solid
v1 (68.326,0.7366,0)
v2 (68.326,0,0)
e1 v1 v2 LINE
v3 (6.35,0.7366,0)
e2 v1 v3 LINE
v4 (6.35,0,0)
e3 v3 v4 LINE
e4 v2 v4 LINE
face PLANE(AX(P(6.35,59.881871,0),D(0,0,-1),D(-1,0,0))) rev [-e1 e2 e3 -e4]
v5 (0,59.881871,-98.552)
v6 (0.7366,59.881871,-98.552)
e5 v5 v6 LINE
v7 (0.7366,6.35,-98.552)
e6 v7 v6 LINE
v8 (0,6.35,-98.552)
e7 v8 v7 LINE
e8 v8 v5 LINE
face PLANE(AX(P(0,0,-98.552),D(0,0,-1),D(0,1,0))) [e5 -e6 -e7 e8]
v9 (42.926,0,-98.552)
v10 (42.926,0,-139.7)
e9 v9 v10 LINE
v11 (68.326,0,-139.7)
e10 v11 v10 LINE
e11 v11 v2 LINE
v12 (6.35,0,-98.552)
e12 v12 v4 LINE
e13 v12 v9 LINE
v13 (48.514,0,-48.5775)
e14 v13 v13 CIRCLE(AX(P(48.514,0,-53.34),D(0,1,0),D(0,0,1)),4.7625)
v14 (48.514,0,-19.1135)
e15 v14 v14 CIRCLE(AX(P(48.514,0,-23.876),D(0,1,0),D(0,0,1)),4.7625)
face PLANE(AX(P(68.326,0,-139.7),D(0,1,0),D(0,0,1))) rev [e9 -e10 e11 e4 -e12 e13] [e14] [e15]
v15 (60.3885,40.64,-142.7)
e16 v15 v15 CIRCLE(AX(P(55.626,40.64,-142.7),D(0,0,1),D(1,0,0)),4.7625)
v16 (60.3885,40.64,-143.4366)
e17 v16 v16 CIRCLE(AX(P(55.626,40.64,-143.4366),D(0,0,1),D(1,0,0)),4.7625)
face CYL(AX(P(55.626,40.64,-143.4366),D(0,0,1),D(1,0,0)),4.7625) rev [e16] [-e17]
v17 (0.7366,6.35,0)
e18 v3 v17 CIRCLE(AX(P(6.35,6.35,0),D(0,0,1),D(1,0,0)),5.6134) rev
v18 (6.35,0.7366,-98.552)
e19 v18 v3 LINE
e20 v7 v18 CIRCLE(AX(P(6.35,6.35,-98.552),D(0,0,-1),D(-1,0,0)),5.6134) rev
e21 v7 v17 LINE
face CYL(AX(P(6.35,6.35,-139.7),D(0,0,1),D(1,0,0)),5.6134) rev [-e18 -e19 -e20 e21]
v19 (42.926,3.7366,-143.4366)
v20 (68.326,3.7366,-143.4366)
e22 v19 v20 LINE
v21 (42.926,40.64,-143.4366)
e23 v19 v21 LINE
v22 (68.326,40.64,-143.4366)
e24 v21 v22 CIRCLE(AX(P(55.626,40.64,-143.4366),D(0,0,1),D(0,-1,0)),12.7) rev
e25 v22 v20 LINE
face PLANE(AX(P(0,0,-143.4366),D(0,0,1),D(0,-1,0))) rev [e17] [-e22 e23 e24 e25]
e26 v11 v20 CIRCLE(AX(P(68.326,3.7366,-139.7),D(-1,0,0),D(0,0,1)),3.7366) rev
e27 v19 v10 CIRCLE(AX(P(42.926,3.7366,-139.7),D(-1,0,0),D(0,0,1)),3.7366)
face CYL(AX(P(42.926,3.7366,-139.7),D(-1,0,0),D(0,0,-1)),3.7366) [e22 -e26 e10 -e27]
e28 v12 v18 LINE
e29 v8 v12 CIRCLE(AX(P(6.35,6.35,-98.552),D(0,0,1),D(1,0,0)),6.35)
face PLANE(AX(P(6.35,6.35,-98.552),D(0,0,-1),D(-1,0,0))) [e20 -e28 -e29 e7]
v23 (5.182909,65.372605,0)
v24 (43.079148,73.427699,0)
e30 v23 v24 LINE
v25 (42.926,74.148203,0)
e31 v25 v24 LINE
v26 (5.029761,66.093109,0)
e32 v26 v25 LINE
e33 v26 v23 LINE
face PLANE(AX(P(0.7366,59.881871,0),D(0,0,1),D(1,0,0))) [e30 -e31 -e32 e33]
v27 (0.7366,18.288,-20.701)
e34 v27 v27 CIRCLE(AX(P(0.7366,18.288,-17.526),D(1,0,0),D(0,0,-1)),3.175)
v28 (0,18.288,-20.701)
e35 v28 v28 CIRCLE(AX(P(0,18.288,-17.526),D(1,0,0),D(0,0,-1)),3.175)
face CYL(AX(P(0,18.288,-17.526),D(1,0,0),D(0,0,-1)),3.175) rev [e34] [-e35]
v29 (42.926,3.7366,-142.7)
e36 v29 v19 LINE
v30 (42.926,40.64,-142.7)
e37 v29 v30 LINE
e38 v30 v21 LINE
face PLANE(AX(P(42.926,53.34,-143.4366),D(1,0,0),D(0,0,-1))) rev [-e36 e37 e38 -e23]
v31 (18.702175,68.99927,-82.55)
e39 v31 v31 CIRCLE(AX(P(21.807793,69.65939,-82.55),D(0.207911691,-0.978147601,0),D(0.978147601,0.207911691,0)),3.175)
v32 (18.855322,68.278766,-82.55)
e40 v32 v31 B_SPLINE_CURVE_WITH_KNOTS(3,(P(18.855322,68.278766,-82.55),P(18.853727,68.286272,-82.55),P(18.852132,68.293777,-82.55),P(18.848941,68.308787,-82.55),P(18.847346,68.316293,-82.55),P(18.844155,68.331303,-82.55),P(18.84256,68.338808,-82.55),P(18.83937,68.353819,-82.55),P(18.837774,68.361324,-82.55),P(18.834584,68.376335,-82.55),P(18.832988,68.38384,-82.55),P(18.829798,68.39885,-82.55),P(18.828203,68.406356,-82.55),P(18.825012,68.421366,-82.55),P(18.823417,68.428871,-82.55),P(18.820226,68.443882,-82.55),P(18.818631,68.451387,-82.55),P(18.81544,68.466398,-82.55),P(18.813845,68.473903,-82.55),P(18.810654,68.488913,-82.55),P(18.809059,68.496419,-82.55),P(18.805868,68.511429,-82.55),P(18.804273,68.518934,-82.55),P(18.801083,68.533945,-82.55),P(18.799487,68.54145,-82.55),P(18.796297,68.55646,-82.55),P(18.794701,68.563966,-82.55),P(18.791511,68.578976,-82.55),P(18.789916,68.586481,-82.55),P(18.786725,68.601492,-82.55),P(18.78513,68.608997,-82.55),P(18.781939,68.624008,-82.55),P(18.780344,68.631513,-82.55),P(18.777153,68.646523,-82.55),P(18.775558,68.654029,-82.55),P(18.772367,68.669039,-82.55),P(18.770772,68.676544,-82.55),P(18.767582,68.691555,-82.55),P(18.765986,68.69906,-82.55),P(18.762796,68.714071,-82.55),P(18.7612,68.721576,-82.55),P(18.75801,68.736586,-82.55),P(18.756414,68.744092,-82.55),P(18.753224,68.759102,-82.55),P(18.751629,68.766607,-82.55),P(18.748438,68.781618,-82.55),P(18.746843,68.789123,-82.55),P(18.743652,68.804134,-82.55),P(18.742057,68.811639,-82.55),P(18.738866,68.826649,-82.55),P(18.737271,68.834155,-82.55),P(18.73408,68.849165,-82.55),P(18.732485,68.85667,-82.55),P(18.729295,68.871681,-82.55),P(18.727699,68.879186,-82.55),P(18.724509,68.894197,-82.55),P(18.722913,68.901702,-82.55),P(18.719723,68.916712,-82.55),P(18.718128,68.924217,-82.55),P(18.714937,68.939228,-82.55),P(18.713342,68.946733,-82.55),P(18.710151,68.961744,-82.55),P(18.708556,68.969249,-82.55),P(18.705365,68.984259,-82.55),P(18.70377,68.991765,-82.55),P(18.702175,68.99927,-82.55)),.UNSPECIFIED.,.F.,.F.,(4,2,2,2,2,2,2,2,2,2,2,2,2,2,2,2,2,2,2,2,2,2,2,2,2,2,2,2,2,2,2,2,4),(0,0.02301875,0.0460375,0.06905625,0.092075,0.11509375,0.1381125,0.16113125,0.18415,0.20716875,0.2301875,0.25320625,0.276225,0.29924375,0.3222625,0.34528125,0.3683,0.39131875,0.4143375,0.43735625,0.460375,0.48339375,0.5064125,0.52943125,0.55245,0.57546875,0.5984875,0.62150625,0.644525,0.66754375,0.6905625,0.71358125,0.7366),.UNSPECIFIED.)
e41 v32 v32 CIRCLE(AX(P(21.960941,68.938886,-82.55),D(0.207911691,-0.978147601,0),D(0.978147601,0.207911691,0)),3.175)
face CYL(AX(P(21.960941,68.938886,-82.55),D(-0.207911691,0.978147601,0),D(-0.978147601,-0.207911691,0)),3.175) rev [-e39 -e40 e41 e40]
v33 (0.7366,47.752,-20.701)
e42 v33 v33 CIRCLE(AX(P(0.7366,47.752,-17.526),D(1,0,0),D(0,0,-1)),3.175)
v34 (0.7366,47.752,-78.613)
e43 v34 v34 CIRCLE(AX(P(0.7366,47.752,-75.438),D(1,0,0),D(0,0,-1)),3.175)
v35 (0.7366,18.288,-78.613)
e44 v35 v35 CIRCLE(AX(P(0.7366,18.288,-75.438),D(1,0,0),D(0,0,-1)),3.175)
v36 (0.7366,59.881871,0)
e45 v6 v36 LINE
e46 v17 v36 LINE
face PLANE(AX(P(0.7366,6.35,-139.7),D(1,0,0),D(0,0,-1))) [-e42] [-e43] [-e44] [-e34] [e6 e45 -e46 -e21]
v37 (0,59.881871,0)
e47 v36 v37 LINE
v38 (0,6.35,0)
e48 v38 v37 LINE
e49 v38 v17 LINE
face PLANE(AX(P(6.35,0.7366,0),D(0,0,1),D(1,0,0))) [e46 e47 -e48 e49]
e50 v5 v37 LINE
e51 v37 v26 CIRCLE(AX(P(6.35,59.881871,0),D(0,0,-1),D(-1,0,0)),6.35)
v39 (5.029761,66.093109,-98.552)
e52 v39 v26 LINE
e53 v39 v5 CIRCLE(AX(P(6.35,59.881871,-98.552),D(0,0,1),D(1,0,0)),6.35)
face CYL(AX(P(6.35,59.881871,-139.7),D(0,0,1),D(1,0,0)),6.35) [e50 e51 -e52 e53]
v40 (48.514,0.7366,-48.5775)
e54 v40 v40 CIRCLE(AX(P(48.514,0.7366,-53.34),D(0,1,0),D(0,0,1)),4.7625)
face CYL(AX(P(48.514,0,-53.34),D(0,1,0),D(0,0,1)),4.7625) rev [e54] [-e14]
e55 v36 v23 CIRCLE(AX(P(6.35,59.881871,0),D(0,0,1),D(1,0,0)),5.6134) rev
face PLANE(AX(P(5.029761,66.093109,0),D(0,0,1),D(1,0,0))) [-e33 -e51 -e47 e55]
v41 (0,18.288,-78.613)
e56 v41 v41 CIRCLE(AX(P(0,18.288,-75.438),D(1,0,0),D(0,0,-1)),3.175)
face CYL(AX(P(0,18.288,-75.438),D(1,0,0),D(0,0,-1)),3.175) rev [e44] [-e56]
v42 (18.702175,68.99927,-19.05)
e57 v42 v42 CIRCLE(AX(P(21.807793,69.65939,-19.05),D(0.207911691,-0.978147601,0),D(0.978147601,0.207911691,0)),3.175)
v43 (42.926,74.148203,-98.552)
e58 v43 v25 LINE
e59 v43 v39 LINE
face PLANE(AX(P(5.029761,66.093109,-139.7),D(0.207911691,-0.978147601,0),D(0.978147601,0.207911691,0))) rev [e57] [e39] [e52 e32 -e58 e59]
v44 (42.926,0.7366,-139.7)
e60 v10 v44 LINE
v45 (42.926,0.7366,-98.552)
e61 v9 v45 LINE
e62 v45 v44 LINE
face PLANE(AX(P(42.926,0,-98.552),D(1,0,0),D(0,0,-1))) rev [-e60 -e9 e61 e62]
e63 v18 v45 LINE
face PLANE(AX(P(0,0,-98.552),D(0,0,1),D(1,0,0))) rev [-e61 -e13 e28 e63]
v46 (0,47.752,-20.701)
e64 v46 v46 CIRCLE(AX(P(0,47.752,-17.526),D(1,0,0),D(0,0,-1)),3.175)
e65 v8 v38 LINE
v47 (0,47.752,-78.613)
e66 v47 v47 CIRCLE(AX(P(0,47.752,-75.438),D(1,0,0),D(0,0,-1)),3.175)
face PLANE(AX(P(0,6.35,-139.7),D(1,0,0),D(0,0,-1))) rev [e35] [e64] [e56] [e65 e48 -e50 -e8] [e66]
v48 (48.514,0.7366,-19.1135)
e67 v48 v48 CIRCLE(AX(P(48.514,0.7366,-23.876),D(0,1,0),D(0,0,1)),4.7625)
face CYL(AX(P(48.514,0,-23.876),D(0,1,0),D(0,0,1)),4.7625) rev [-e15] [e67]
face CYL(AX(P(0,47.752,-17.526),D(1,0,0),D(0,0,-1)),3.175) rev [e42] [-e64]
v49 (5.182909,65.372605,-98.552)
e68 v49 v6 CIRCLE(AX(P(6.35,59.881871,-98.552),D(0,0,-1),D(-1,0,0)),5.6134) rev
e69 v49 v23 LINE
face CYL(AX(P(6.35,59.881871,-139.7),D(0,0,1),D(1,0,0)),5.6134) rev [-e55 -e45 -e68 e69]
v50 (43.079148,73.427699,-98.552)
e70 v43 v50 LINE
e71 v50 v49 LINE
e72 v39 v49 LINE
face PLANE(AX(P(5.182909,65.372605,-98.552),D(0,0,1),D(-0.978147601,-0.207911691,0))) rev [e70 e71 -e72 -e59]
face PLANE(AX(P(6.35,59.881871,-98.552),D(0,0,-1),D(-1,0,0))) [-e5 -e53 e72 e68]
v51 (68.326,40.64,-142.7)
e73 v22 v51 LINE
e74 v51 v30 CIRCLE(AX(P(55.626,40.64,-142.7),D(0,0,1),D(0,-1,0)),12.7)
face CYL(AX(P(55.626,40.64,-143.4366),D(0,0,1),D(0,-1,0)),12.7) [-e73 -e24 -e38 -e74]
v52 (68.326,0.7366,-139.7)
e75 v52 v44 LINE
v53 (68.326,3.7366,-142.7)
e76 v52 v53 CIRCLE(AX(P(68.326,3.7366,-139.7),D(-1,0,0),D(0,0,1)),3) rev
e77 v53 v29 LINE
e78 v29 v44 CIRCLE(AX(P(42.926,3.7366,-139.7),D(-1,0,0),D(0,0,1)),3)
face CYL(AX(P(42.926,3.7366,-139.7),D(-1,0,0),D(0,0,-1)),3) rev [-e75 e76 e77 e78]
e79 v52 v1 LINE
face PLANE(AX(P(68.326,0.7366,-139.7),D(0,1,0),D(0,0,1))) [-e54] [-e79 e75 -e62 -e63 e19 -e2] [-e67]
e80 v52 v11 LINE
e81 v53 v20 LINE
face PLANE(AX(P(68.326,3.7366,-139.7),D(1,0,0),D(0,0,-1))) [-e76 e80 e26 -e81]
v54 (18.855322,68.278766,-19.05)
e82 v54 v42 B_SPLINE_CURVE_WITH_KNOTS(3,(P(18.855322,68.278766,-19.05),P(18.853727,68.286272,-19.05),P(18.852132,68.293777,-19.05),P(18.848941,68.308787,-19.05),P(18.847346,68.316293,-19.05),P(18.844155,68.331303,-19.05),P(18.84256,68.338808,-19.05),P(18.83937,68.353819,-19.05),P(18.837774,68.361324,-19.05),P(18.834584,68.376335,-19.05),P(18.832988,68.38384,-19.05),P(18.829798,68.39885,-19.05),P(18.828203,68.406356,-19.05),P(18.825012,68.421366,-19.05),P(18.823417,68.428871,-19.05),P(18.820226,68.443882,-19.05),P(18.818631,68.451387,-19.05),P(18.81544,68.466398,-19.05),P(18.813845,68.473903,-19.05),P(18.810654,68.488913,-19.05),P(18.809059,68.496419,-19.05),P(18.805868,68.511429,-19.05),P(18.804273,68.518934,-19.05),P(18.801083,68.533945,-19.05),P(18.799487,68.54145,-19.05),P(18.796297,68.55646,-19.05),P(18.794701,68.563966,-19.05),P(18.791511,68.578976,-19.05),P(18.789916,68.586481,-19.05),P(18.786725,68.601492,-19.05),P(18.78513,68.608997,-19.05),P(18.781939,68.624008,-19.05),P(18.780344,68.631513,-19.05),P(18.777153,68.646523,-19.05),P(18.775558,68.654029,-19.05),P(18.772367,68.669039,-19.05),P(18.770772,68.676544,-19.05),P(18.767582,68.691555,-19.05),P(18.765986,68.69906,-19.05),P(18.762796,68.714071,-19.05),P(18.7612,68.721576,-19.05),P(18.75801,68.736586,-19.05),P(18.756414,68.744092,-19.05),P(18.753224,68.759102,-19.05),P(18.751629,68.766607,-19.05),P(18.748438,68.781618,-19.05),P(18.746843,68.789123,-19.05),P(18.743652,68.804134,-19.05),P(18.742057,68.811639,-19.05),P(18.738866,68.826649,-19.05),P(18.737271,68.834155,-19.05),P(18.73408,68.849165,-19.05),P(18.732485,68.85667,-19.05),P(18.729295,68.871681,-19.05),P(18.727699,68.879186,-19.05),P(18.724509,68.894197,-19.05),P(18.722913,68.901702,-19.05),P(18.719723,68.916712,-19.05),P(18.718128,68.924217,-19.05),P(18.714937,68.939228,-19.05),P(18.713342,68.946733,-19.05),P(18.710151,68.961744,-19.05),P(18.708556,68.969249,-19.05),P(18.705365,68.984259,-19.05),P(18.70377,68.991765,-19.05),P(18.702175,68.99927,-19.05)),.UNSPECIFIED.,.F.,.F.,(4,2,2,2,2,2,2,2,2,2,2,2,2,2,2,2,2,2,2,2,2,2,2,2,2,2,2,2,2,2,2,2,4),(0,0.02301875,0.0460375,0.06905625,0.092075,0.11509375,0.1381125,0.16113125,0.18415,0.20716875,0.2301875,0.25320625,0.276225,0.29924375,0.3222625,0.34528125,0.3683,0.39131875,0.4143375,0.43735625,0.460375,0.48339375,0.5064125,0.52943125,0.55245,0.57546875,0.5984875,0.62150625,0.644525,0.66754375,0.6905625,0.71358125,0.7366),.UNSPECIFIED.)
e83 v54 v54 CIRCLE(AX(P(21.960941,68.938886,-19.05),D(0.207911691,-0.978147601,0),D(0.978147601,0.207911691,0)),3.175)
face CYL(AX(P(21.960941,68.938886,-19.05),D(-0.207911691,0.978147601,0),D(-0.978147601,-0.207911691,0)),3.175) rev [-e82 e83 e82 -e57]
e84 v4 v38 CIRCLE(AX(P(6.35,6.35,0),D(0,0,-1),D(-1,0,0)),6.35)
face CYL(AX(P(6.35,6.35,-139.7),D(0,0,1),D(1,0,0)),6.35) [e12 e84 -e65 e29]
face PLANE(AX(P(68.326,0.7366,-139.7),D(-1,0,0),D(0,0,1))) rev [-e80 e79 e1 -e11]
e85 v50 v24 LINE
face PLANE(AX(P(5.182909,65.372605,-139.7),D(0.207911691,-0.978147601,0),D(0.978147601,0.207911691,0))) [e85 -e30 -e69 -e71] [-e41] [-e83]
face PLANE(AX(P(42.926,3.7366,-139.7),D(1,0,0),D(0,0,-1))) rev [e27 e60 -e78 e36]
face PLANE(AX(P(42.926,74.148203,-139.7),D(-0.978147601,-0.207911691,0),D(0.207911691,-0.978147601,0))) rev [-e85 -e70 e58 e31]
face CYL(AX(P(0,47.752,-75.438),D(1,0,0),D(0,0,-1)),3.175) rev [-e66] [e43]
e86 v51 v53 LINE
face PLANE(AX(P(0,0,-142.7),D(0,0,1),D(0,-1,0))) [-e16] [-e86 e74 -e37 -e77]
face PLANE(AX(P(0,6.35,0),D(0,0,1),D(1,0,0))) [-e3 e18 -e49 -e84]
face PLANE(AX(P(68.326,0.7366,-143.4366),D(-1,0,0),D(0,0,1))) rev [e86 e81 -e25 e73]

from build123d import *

# Parameters (mm, degrees)
BASE_FLANGE1_DEPTH = 139.7
CUT_EXTRUDE1_START = -139.7
CUT_EXTRUDE1_DEPTH = 41.148
EDGE_FLANGE1_DEPTH = 25.4
FILLET1_RADIUS     = 12.7
FILLET1_LENGTH     = 0.7366
HOLE1_START        = -143.4366
HOLE1_OUTLINE_R    = 4.7625
HOLE1_DEPTH        = 0.7366
SKETCH34_R         = 3.175
CUT_EXTRUDE2_DEPTH = 2.54
SKETCH35_R         = 4.7625
CUT_EXTRUDE3_DEPTH = 2.54
SKETCH36_R         = 3.175
CUT_EXTRUDE4_DEPTH = 2.54


# Read off the part's stored shape, not the designer's step: Cut-Extrude1, Hole1
# Sheet-metal steps are written as plain solids
with BuildPart() as part:
    # Sketch1 → Base-Flange1 (new body)
    with BuildSketch(Plane.XY):
        with BuildLine():
            Line((68.326, 0), (6.35, 0))
            ThreePointArc((6.35, 0), (1.859871939, 1.859871939), (0, 6.35))
            Line((0, 6.35), (0, 59.881871389))
            ThreePointArc((0, 59.881871389), (1.415123145, 63.878055872), (5.029760763, 66.093108654))
            Line((5.029760763, 66.093108654), (42.926, 74.148202966))
            Line((42.926, 74.148202966), (43.079147751, 73.427699444))
            Line((43.079147751, 73.427699444), (5.182908515, 65.372605131))
            ThreePointArc((5.182908515, 65.372605131), (1.98756886, 63.414498472), (0.7366, 59.881871389))
            Line((0.7366, 59.881871389), (0.7366, 6.35))
            ThreePointArc((0.7366, 6.35), (2.380726794, 2.380726794), (6.35, 0.7366))
            Line((6.35, 0.7366), (68.326, 0.7366))
            Line((68.326, 0.7366), (68.326, 0))
        make_face()
    extrude(amount=-BASE_FLANGE1_DEPTH)

    # Cut-Extrude1 outline → Cut-Extrude1 (cut)
    with BuildSketch(Plane.XY.offset(CUT_EXTRUDE1_START)):
        with BuildLine():
            Line((6.35, 0), (42.926, 0))
            Line((42.926, 0), (42.926, 0.7366))
            Line((42.926, 0.7366), (6.35, 0.7366))
            ThreePointArc((6.35, 0.7366), (2.380726794, 2.380726794), (0.7366, 6.35))
            Line((0.7366, 6.35), (0.7366, 59.881871389))
            ThreePointArc((0.7366, 59.881871389), (1.98756886, 63.414498472), (5.182908515, 65.372605131))
            Line((5.182908515, 65.372605131), (43.079147751, 73.427699444))
            Line((43.079147751, 73.427699444), (42.926, 74.148202966))
            Line((42.926, 74.148202966), (5.029760763, 66.093108654))
            ThreePointArc((5.029760763, 66.093108654), (1.415123145, 63.878055872), (0, 59.881871389))
            Line((0, 59.881871389), (0, 6.35))
            ThreePointArc((0, 6.35), (1.859871939, 1.859871939), (6.35, 0))
        make_face()
    extrude(amount=CUT_EXTRUDE1_DEPTH, mode=Mode.SUBTRACT)

    # Edge-Flange1 section (across the edge) → Edge-Flange1 (add)
    with BuildSketch(Plane(origin=(68.326, 0.7366, -142.7), x_dir=(0, 0, 1), z_dir=(-1, 0, 0))):
        with BuildLine():
            Line((-0.7366, 3), (-0.7366, 52.6034))
            Line((-0.7366, 52.6034), (0, 52.6034))
            Line((0, 52.6034), (0, 3))
            ThreePointArc((0, 3), (0.878679656, 0.878679656), (3, 0))
            Line((3, 0), (3, -0.7366))
            ThreePointArc((3, -0.7366), (0.357824801, 0.357824801), (-0.7366, 3))
        make_face()
    extrude(amount=EDGE_FLANGE1_DEPTH)

    # Fillet1: full round fillet: the end face becomes a half cylinder, R = half its width
    fillet1_face = Plane((55.626, 53.34, -143.0683), x_dir=(0, 0, -1), z_dir=(0, 1, 0))  # on the end face: x along it, z out of the body
    fillet1_slab = fillet1_face.offset(-FILLET1_RADIUS / 2) * Box(FILLET1_LENGTH, 2 * FILLET1_RADIUS, FILLET1_RADIUS, mode=Mode.PRIVATE)  # the body's end, R deep
    fillet1_round = Plane((55.626, 40.64, -143.0683), x_dir=(0, 1, 0), z_dir=(0, 0, -1)) * Cylinder(FILLET1_RADIUS, FILLET1_LENGTH, mode=Mode.PRIVATE)  # its axis R under the face
    add(fillet1_slab - fillet1_round, mode=Mode.SUBTRACT)

    # Hole1 outline → Hole1 (cut)
    with BuildSketch(Plane.XY.offset(HOLE1_START)):
        with Locations((55.626, 40.64)):
            Circle(HOLE1_OUTLINE_R)
    extrude(amount=HOLE1_DEPTH, mode=Mode.SUBTRACT)

    # Sketch34 → Cut-Extrude2 (cut)
    with BuildSketch(Plane(origin=(-13.22382174, 62.213189919, 0), x_dir=(0.9781476007338064, 0.20791169081775657, 0), z_dir=(-0.20791169081775657, 0.9781476007338064, 0))):
        with Locations(Location((35.814242159, 19.05, 0), (0, 0, 180))):
            Circle(SKETCH34_R)
        with Locations(Location((35.814242159, 82.55, 0), (0, 0, 180))):
            Circle(SKETCH34_R)
    extrude(amount=-CUT_EXTRUDE2_DEPTH, mode=Mode.SUBTRACT)

    # Sketch35 → Cut-Extrude3 (cut)
    with BuildSketch(Plane(origin=(0, 0.7366, 0), x_dir=(1, 0, 0), z_dir=(0, 1, 0))):
        with Locations(Location((48.514, 23.876, 0), (0, 0, 270))):
            Circle(SKETCH35_R)
        with Locations(Location((48.514, 53.34, 0), (0, 0, 270))):
            Circle(SKETCH35_R)
    extrude(amount=-CUT_EXTRUDE3_DEPTH, mode=Mode.SUBTRACT)

    # Sketch36 → Cut-Extrude4 (cut)
    with BuildSketch(Plane(origin=(0.7366, 0, 0), x_dir=(0, 0, -1), z_dir=(1, 0, 0))):
        with Locations((17.526, 18.288)):
            Circle(SKETCH36_R)
        with Locations((75.438, 18.288)):
            Circle(SKETCH36_R)
        with Locations((17.526, 47.752)):
            Circle(SKETCH36_R)
        with Locations((75.438, 47.752)):
            Circle(SKETCH36_R)
    extrude(amount=-CUT_EXTRUDE4_DEPTH, mode=Mode.SUBTRACT)


solid = part.part
